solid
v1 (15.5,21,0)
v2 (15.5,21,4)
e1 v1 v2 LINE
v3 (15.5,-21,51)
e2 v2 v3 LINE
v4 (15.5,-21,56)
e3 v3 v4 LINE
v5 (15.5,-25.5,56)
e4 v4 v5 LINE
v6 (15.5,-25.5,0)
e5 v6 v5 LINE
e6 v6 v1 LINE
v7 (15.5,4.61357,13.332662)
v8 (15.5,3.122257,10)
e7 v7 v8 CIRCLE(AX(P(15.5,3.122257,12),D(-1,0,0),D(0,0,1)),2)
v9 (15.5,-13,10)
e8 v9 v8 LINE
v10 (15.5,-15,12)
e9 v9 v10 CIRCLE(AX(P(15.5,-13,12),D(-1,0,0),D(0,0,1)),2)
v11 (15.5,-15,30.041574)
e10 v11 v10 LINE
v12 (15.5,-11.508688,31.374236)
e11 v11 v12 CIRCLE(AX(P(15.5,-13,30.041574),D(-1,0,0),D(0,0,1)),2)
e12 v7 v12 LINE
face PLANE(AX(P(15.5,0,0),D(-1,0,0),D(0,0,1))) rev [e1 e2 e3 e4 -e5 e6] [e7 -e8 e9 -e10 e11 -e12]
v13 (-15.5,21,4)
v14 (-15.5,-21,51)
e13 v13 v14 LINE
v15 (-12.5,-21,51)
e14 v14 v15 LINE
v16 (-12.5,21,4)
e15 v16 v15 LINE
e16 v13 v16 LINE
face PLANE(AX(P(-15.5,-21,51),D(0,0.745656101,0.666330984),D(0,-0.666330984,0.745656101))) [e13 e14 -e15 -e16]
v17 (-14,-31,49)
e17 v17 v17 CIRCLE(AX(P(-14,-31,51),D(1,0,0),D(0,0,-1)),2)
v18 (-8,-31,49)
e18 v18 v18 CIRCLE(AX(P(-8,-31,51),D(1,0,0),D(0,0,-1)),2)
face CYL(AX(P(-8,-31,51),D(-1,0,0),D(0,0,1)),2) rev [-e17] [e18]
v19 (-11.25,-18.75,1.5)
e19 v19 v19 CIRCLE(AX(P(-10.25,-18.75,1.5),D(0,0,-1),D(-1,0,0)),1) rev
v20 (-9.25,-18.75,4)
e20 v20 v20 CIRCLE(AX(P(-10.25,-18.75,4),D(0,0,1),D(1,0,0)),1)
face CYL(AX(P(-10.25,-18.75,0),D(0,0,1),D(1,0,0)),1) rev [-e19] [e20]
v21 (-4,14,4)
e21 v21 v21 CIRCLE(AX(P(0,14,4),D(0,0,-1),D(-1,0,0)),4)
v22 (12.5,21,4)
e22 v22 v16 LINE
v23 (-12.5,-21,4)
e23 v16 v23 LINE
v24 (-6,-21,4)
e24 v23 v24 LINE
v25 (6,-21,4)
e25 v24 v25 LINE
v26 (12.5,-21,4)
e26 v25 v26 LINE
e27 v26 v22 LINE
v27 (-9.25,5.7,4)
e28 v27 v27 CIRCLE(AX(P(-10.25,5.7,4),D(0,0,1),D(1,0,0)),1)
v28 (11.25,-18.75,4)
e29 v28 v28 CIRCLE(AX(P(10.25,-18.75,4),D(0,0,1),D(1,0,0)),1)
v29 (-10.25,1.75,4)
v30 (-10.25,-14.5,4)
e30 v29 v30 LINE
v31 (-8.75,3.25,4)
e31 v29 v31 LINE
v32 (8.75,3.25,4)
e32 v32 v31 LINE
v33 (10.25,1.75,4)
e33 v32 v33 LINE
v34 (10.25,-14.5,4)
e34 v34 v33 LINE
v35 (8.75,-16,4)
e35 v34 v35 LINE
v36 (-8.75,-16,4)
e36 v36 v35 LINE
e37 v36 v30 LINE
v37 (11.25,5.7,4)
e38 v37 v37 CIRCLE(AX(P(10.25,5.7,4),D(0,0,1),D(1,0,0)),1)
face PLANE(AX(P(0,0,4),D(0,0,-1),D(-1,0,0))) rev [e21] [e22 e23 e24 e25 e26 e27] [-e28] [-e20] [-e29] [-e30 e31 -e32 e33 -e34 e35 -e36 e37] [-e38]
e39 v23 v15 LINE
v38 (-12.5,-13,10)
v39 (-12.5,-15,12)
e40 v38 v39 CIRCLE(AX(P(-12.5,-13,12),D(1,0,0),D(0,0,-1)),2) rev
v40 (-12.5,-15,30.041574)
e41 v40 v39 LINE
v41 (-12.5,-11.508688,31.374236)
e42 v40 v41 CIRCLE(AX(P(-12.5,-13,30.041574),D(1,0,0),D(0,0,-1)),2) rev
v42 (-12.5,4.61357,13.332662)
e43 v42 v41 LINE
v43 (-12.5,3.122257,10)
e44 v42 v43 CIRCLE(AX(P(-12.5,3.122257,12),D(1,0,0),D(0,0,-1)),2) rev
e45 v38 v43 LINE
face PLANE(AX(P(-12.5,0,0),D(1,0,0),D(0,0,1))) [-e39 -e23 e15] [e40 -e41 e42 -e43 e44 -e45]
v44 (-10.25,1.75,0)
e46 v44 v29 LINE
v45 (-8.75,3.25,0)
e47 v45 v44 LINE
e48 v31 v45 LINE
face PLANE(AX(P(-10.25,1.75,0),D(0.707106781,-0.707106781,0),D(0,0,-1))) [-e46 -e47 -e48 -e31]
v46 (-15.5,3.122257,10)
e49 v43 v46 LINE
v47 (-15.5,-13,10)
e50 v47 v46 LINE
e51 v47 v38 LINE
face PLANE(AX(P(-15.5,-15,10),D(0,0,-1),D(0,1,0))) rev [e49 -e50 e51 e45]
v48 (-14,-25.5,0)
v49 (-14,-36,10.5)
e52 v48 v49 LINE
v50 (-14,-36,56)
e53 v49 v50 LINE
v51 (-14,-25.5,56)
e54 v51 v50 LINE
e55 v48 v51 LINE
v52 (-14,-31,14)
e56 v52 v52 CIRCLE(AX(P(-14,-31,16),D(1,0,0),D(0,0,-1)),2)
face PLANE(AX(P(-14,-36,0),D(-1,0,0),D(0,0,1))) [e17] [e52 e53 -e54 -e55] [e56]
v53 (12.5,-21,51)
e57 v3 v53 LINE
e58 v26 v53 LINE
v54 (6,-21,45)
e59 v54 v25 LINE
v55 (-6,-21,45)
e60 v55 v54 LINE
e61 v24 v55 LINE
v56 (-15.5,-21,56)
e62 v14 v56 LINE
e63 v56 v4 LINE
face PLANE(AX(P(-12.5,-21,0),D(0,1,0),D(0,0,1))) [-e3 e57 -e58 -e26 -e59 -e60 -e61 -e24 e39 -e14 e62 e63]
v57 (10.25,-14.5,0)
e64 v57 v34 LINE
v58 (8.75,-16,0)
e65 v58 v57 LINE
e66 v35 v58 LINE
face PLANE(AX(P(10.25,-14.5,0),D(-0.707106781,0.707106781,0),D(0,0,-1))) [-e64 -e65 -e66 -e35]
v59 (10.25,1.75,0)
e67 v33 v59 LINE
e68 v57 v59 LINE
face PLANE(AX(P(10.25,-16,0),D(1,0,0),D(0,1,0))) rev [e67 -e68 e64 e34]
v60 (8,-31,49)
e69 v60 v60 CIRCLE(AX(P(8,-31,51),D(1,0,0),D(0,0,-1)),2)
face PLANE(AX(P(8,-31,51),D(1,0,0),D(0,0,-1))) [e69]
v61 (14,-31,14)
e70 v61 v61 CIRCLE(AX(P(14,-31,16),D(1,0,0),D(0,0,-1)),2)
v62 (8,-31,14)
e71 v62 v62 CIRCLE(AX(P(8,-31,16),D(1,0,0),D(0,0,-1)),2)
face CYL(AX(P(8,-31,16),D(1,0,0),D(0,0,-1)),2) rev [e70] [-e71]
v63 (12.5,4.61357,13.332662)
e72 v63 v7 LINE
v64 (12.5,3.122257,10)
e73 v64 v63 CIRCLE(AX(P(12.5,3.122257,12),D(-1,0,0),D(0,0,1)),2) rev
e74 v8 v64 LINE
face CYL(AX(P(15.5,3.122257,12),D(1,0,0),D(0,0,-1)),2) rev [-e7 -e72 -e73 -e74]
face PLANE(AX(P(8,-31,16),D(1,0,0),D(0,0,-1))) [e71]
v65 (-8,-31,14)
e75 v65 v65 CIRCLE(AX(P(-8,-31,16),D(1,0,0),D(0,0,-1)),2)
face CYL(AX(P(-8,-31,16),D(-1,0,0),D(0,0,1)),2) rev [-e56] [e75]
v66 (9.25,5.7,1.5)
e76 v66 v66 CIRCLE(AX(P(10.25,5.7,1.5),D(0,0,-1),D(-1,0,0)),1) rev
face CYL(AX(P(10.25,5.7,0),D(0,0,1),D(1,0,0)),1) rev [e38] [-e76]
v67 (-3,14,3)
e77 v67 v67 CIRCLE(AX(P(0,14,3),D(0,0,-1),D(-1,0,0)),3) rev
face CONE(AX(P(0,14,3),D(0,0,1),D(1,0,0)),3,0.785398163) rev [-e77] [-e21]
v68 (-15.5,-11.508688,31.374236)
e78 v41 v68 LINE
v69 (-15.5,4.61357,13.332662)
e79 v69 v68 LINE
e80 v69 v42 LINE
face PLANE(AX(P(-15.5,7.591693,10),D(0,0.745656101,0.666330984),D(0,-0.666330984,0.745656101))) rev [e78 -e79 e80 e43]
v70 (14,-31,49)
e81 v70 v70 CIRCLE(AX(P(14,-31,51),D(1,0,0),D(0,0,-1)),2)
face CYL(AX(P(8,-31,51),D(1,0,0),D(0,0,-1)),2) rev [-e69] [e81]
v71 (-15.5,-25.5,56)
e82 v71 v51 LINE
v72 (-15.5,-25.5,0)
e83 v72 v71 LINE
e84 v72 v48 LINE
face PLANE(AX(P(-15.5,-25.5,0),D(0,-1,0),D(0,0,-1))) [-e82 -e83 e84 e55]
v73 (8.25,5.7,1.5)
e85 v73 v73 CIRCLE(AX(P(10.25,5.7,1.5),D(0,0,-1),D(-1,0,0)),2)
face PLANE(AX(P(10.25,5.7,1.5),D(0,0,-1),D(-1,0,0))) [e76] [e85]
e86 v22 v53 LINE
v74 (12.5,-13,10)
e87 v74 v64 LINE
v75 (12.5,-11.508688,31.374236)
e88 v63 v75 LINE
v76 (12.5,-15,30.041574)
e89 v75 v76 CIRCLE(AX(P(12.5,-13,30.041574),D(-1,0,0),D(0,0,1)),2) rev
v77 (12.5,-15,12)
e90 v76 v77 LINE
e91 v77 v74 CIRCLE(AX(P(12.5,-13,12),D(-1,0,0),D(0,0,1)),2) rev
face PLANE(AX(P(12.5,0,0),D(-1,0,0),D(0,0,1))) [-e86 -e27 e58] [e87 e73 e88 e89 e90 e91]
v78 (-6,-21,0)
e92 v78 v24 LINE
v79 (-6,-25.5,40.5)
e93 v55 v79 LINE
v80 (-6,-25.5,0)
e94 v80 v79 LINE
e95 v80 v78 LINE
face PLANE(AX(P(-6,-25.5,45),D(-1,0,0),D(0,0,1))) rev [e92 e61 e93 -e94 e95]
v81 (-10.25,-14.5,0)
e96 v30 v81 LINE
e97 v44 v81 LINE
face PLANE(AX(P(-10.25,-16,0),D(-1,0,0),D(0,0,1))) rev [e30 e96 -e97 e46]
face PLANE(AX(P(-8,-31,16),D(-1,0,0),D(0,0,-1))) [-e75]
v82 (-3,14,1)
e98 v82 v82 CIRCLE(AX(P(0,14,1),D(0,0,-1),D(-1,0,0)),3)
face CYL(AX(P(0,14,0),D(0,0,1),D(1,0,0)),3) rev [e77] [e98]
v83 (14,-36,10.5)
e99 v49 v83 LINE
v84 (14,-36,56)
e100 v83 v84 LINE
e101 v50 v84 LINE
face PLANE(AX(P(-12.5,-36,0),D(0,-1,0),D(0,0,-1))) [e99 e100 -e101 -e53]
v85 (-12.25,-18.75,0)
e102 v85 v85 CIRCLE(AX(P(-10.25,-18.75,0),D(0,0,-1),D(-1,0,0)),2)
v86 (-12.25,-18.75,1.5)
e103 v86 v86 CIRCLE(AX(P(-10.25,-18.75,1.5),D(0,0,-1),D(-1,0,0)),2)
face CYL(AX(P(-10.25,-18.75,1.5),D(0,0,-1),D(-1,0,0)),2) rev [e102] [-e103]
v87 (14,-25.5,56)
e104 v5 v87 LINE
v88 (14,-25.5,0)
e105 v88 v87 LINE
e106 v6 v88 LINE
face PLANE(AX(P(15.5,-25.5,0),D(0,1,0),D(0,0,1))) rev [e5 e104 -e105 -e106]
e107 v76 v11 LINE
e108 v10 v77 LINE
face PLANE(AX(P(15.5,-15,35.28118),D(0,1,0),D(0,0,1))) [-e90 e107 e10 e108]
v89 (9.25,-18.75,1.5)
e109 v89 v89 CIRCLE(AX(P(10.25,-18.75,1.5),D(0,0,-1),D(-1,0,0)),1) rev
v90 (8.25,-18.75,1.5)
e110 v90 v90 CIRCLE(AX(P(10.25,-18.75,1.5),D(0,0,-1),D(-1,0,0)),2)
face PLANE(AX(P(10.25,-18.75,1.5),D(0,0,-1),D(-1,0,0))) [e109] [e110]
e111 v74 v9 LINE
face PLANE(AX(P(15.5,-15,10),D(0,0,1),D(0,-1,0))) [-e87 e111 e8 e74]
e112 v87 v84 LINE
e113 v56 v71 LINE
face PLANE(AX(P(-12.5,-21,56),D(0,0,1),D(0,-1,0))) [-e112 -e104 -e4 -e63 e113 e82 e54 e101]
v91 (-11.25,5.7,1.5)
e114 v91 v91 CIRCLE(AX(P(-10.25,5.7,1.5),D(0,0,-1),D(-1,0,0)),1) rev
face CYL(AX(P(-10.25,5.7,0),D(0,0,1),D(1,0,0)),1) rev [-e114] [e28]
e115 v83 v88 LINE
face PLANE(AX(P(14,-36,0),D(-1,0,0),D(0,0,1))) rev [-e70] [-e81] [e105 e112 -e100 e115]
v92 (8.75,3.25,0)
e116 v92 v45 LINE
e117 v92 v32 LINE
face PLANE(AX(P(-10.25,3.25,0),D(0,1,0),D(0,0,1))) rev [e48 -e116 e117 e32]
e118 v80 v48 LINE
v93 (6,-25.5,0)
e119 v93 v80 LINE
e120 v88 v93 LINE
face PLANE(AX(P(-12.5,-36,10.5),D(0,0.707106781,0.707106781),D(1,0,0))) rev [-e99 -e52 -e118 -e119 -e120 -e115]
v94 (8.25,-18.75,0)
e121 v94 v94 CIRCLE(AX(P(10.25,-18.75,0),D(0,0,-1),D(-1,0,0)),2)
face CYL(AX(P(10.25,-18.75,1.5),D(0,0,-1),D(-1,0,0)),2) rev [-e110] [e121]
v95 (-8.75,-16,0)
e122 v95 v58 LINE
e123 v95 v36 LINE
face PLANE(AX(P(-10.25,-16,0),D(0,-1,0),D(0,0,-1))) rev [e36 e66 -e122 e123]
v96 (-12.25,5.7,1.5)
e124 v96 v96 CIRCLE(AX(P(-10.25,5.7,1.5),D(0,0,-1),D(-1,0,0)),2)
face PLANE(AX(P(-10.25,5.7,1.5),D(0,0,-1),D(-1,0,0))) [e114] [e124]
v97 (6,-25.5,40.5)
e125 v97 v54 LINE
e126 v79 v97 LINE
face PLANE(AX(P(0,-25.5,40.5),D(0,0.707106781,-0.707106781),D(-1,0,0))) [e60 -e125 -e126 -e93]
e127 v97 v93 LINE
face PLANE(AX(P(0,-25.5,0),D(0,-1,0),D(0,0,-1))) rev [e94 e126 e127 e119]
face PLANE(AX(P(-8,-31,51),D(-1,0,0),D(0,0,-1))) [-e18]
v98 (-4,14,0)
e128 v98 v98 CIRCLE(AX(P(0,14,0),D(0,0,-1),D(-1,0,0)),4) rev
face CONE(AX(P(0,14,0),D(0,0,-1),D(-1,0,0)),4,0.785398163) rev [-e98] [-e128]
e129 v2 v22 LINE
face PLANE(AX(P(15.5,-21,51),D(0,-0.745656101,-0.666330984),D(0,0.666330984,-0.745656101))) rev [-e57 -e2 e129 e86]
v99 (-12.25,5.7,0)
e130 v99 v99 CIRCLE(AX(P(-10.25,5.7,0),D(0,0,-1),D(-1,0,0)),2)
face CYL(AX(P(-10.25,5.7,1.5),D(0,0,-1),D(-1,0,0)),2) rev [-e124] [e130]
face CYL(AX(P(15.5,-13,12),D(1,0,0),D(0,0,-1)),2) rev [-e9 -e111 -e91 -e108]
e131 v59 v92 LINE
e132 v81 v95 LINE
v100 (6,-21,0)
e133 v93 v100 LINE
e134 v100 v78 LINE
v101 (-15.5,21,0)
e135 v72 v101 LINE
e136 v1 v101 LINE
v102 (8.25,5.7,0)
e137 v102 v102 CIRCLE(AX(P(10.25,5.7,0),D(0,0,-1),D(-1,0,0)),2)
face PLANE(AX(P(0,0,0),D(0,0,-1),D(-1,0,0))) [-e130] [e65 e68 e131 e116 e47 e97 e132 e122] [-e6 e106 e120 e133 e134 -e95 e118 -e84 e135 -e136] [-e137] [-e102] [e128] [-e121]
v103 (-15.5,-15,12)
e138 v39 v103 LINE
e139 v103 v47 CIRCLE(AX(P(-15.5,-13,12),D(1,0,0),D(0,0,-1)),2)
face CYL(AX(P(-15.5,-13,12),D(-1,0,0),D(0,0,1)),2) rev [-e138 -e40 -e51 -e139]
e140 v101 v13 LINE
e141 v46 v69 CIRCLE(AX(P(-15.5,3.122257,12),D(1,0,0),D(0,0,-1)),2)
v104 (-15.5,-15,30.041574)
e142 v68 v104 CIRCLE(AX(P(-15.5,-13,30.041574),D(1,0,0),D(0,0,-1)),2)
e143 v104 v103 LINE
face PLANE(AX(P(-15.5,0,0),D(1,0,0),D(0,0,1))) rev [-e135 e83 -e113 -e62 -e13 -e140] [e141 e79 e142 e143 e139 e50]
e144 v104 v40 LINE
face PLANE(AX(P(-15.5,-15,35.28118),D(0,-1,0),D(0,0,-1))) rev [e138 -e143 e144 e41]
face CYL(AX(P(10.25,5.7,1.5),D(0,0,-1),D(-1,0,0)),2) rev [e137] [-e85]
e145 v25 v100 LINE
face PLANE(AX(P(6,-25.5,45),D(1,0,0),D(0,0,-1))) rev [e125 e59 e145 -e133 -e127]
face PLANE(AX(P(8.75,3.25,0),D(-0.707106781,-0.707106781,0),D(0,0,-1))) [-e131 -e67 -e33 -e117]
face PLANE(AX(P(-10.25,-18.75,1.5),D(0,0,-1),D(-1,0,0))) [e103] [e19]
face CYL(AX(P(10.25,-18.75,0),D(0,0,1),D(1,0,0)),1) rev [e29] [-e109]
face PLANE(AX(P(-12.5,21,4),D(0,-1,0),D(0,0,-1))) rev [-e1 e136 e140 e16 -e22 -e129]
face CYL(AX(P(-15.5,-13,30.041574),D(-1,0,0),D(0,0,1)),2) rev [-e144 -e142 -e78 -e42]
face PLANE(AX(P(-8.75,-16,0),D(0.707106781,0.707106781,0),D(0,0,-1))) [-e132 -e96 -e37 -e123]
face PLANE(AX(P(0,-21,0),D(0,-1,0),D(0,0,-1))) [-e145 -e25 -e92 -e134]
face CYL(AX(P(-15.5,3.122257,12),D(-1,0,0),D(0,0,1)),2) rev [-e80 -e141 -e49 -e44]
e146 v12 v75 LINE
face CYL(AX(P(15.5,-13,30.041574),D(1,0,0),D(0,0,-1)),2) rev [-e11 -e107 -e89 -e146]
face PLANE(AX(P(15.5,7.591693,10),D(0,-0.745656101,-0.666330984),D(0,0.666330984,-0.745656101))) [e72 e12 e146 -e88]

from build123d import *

# Parameters (mm, degrees)
SKETCH2_W           = 25
SKETCH2_H           = 42
BOSS_EXTRUDE1_DEPTH = 4
SKETCH5_W           = 56
SKETCH5_H           = 15
BOSS_EXTRUDE2_DEPTH = 25
BOSS_EXTRUDE3_DEPTH = 3
SKETCH7_W           = 1.5
SKETCH7_H           = 10.5
CUT_EXTRUDE1_DEPTH  = 69.353858706
SKETCH9_R           = 2
CUT_EXTRUDE2_DEPTH  = 6
CHAMFER1_SIZE       = 10.5
SKETCH10_R          = 1
CUT_EXTRUDE3_DEPTH  = 66.117202028
SKETCH11_W          = 20.5
SKETCH11_H          = 19.25
CUT_EXTRUDE4_DEPTH  = 66.117202028
CHAMFER3_SIZE       = 1.5
SKETCH12_R          = 3
CUT_EXTRUDE5_DEPTH  = 66.117202028
CHAMFER4_SIZE       = 1
SKETCH13_R          = 2
CUT_EXTRUDE6_DEPTH  = 1.5
CUT_EXTRUDE7_DEPTH  = 73.221880341
FILLET1_R           = 2
SKETCH16_W          = 12
SKETCH16_H          = 45
CUT_EXTRUDE8_DEPTH  = 4.5
CHAMFER5_SIZE       = 4.5


with BuildPart() as part:
    # Sketch2 → Boss-Extrude1 (new body)
    with BuildSketch(Plane.XY):
        Rectangle(SKETCH2_W, SKETCH2_H)
    extrude(amount=BOSS_EXTRUDE1_DEPTH)

    # Sketch5 → Boss-Extrude2 (add, through all)
    with BuildSketch(Plane(origin=(12.5, 0, 0), x_dir=(0, 0, -1), z_dir=(1, 0, 0))):
        with Locations((-28, -28.5)):
            Rectangle(SKETCH5_W, SKETCH5_H)
    extrude(amount=-BOSS_EXTRUDE2_DEPTH)

    # Sketch6 → Boss-Extrude3 (add)
    with BuildSketch(Plane(origin=(12.5, 0, 0), x_dir=(0, 0, -1), z_dir=(1, 0, 0))):
        Polygon((-4, 21), (0, 21), (0, -36), (-56, -36), (-56, -21), (-51, -21), align=None)
    boss_extrude3 = extrude(amount=BOSS_EXTRUDE3_DEPTH)

    # Sketch7 → Cut-Extrude1 (cut, through all)
    with BuildSketch(Plane.XY.offset(56)):
        with Locations((14.75, -30.75)):
            Rectangle(SKETCH7_W, SKETCH7_H)
    cut_extrude1 = extrude(amount=-CUT_EXTRUDE1_DEPTH, mode=Mode.SUBTRACT)

    # Sketch9 → Cut-Extrude2 (cut)
    with BuildSketch(Plane(origin=(14, 0, 0), x_dir=(0, 0, -1), z_dir=(1, 0, 0))):
        with Locations((-51, -31)):
            Circle(SKETCH9_R)
        with Locations((-16, -31)):
            Circle(SKETCH9_R)
    cut_extrude2 = extrude(amount=-CUT_EXTRUDE2_DEPTH, mode=Mode.SUBTRACT)

    # Mirror1: Boss-Extrude3, Cut-Extrude1, Cut-Extrude2 across plane
    add(boss_extrude3.mirror(Plane(origin=(0, 0, 0), x_dir=(0, 0, 1), z_dir=(1, 0, 0))))
    add(cut_extrude1.mirror(Plane(origin=(0, 0, 0), x_dir=(0, 0, 1), z_dir=(1, 0, 0))), mode=Mode.SUBTRACT)
    add(cut_extrude2.mirror(Plane(origin=(0, 0, 0), x_dir=(0, 0, 1), z_dir=(1, 0, 0))), mode=Mode.SUBTRACT)

    # Chamfer1
    chamfer1_edges = [part.edges().sort_by_distance(p)[0] for p in [
        (0, -36, 0),
    ]]
    chamfer(chamfer1_edges, length=CHAMFER1_SIZE)

    # Sketch10 → Cut-Extrude3 (cut, through all)
    with BuildSketch(Plane.XY.offset(4)):
        with Locations((-10.25, 5.7)):
            Circle(SKETCH10_R)
        with Locations((10.25, 5.7)):
            Circle(SKETCH10_R)
        with Locations((10.25, -18.75)):
            Circle(SKETCH10_R)
        with Locations((-10.25, -18.75)):
            Circle(SKETCH10_R)
    extrude(amount=-CUT_EXTRUDE3_DEPTH, mode=Mode.SUBTRACT)

    # Sketch11 → Cut-Extrude4 (cut, through all)
    with BuildSketch(Plane.XY.offset(4)):
        with Locations((0, -6.375)):
            Rectangle(SKETCH11_W, SKETCH11_H)
    extrude(amount=-CUT_EXTRUDE4_DEPTH, mode=Mode.SUBTRACT)

    # Chamfer3
    chamfer3_edges = [part.edges().sort_by_distance(p)[0] for p in [
        (10.25, 3.25, 2),
        (10.25, -16, 2),
        (-10.25, -16, 2),
        (-10.25, 3.25, 2),
    ]]
    chamfer(chamfer3_edges, length=CHAMFER3_SIZE)

    # Sketch12 → Cut-Extrude5 (cut, through all)
    with BuildSketch(Plane.XY.offset(4)):
        with Locations((0, 14)):
            Circle(SKETCH12_R)
    extrude(amount=-CUT_EXTRUDE5_DEPTH, mode=Mode.SUBTRACT)

    # Chamfer4
    chamfer4_edges = [part.edges().sort_by_distance(p)[0] for p in [
        (-3, 14, 0),
        (-3, 14, 4),
    ]]
    chamfer(chamfer4_edges, length=CHAMFER4_SIZE)

    # Sketch13 → Cut-Extrude6 (cut)
    with BuildSketch(Plane(origin=(0, 0, 0), x_dir=(-1, 0, 0), z_dir=(0, 0, -1))):
        with Locations((-10.25, 5.7)):
            Circle(SKETCH13_R)
        with Locations((10.25, 5.7)):
            Circle(SKETCH13_R)
        with Locations((10.25, -18.75)):
            Circle(SKETCH13_R)
        with Locations((-10.25, -18.75)):
            Circle(SKETCH13_R)
    extrude(amount=-CUT_EXTRUDE6_DEPTH, mode=Mode.SUBTRACT)

    # Sketch14 → Cut-Extrude7 (cut, through all)
    with BuildSketch(Plane(origin=(-12.5, 0, 0), x_dir=(0, 0, -1), z_dir=(1, 0, 0))):
        Polygon((-35.28118028, -15), (-10, -15), (-10, 7.591693017), align=None)
    cut_extrude7 = extrude(amount=-CUT_EXTRUDE7_DEPTH, mode=Mode.SUBTRACT)

    # Mirror2: Cut-Extrude7 across plane
    add(cut_extrude7.mirror(Plane(origin=(0, 0, 0), x_dir=(0, 0, 1), z_dir=(1, 0, 0))), mode=Mode.SUBTRACT)

    # Fillet1
    fillet1_edges = [part.edges().sort_by_distance(p)[0] for p in [
        (-14, -15, 35.28118028),
        (-14, 7.591693017, 10),
        (-14, -15, 10),
        (14, 7.591693017, 10),
        (14, -15, 35.28118028),
        (14, -15, 10),
    ]]
    fillet(fillet1_edges, radius=FILLET1_R)

    # Sketch16 → Cut-Extrude8 (cut)
    with BuildSketch(Plane(origin=(0, -21, 0), x_dir=(1, 0, 0), z_dir=(0, 1, 0))):
        with Locations((0, -22.5)):
            Rectangle(SKETCH16_W, SKETCH16_H)
    extrude(amount=-CUT_EXTRUDE8_DEPTH, mode=Mode.SUBTRACT)

    # Chamfer5
    chamfer5_edges = [part.edges().sort_by_distance(p)[0] for p in [
        (0, -25.5, 45),
    ]]
    chamfer(chamfer5_edges, length=CHAMFER5_SIZE - 0.0001)  # a hair under: the kernel refuses the full size


solid = part.part
